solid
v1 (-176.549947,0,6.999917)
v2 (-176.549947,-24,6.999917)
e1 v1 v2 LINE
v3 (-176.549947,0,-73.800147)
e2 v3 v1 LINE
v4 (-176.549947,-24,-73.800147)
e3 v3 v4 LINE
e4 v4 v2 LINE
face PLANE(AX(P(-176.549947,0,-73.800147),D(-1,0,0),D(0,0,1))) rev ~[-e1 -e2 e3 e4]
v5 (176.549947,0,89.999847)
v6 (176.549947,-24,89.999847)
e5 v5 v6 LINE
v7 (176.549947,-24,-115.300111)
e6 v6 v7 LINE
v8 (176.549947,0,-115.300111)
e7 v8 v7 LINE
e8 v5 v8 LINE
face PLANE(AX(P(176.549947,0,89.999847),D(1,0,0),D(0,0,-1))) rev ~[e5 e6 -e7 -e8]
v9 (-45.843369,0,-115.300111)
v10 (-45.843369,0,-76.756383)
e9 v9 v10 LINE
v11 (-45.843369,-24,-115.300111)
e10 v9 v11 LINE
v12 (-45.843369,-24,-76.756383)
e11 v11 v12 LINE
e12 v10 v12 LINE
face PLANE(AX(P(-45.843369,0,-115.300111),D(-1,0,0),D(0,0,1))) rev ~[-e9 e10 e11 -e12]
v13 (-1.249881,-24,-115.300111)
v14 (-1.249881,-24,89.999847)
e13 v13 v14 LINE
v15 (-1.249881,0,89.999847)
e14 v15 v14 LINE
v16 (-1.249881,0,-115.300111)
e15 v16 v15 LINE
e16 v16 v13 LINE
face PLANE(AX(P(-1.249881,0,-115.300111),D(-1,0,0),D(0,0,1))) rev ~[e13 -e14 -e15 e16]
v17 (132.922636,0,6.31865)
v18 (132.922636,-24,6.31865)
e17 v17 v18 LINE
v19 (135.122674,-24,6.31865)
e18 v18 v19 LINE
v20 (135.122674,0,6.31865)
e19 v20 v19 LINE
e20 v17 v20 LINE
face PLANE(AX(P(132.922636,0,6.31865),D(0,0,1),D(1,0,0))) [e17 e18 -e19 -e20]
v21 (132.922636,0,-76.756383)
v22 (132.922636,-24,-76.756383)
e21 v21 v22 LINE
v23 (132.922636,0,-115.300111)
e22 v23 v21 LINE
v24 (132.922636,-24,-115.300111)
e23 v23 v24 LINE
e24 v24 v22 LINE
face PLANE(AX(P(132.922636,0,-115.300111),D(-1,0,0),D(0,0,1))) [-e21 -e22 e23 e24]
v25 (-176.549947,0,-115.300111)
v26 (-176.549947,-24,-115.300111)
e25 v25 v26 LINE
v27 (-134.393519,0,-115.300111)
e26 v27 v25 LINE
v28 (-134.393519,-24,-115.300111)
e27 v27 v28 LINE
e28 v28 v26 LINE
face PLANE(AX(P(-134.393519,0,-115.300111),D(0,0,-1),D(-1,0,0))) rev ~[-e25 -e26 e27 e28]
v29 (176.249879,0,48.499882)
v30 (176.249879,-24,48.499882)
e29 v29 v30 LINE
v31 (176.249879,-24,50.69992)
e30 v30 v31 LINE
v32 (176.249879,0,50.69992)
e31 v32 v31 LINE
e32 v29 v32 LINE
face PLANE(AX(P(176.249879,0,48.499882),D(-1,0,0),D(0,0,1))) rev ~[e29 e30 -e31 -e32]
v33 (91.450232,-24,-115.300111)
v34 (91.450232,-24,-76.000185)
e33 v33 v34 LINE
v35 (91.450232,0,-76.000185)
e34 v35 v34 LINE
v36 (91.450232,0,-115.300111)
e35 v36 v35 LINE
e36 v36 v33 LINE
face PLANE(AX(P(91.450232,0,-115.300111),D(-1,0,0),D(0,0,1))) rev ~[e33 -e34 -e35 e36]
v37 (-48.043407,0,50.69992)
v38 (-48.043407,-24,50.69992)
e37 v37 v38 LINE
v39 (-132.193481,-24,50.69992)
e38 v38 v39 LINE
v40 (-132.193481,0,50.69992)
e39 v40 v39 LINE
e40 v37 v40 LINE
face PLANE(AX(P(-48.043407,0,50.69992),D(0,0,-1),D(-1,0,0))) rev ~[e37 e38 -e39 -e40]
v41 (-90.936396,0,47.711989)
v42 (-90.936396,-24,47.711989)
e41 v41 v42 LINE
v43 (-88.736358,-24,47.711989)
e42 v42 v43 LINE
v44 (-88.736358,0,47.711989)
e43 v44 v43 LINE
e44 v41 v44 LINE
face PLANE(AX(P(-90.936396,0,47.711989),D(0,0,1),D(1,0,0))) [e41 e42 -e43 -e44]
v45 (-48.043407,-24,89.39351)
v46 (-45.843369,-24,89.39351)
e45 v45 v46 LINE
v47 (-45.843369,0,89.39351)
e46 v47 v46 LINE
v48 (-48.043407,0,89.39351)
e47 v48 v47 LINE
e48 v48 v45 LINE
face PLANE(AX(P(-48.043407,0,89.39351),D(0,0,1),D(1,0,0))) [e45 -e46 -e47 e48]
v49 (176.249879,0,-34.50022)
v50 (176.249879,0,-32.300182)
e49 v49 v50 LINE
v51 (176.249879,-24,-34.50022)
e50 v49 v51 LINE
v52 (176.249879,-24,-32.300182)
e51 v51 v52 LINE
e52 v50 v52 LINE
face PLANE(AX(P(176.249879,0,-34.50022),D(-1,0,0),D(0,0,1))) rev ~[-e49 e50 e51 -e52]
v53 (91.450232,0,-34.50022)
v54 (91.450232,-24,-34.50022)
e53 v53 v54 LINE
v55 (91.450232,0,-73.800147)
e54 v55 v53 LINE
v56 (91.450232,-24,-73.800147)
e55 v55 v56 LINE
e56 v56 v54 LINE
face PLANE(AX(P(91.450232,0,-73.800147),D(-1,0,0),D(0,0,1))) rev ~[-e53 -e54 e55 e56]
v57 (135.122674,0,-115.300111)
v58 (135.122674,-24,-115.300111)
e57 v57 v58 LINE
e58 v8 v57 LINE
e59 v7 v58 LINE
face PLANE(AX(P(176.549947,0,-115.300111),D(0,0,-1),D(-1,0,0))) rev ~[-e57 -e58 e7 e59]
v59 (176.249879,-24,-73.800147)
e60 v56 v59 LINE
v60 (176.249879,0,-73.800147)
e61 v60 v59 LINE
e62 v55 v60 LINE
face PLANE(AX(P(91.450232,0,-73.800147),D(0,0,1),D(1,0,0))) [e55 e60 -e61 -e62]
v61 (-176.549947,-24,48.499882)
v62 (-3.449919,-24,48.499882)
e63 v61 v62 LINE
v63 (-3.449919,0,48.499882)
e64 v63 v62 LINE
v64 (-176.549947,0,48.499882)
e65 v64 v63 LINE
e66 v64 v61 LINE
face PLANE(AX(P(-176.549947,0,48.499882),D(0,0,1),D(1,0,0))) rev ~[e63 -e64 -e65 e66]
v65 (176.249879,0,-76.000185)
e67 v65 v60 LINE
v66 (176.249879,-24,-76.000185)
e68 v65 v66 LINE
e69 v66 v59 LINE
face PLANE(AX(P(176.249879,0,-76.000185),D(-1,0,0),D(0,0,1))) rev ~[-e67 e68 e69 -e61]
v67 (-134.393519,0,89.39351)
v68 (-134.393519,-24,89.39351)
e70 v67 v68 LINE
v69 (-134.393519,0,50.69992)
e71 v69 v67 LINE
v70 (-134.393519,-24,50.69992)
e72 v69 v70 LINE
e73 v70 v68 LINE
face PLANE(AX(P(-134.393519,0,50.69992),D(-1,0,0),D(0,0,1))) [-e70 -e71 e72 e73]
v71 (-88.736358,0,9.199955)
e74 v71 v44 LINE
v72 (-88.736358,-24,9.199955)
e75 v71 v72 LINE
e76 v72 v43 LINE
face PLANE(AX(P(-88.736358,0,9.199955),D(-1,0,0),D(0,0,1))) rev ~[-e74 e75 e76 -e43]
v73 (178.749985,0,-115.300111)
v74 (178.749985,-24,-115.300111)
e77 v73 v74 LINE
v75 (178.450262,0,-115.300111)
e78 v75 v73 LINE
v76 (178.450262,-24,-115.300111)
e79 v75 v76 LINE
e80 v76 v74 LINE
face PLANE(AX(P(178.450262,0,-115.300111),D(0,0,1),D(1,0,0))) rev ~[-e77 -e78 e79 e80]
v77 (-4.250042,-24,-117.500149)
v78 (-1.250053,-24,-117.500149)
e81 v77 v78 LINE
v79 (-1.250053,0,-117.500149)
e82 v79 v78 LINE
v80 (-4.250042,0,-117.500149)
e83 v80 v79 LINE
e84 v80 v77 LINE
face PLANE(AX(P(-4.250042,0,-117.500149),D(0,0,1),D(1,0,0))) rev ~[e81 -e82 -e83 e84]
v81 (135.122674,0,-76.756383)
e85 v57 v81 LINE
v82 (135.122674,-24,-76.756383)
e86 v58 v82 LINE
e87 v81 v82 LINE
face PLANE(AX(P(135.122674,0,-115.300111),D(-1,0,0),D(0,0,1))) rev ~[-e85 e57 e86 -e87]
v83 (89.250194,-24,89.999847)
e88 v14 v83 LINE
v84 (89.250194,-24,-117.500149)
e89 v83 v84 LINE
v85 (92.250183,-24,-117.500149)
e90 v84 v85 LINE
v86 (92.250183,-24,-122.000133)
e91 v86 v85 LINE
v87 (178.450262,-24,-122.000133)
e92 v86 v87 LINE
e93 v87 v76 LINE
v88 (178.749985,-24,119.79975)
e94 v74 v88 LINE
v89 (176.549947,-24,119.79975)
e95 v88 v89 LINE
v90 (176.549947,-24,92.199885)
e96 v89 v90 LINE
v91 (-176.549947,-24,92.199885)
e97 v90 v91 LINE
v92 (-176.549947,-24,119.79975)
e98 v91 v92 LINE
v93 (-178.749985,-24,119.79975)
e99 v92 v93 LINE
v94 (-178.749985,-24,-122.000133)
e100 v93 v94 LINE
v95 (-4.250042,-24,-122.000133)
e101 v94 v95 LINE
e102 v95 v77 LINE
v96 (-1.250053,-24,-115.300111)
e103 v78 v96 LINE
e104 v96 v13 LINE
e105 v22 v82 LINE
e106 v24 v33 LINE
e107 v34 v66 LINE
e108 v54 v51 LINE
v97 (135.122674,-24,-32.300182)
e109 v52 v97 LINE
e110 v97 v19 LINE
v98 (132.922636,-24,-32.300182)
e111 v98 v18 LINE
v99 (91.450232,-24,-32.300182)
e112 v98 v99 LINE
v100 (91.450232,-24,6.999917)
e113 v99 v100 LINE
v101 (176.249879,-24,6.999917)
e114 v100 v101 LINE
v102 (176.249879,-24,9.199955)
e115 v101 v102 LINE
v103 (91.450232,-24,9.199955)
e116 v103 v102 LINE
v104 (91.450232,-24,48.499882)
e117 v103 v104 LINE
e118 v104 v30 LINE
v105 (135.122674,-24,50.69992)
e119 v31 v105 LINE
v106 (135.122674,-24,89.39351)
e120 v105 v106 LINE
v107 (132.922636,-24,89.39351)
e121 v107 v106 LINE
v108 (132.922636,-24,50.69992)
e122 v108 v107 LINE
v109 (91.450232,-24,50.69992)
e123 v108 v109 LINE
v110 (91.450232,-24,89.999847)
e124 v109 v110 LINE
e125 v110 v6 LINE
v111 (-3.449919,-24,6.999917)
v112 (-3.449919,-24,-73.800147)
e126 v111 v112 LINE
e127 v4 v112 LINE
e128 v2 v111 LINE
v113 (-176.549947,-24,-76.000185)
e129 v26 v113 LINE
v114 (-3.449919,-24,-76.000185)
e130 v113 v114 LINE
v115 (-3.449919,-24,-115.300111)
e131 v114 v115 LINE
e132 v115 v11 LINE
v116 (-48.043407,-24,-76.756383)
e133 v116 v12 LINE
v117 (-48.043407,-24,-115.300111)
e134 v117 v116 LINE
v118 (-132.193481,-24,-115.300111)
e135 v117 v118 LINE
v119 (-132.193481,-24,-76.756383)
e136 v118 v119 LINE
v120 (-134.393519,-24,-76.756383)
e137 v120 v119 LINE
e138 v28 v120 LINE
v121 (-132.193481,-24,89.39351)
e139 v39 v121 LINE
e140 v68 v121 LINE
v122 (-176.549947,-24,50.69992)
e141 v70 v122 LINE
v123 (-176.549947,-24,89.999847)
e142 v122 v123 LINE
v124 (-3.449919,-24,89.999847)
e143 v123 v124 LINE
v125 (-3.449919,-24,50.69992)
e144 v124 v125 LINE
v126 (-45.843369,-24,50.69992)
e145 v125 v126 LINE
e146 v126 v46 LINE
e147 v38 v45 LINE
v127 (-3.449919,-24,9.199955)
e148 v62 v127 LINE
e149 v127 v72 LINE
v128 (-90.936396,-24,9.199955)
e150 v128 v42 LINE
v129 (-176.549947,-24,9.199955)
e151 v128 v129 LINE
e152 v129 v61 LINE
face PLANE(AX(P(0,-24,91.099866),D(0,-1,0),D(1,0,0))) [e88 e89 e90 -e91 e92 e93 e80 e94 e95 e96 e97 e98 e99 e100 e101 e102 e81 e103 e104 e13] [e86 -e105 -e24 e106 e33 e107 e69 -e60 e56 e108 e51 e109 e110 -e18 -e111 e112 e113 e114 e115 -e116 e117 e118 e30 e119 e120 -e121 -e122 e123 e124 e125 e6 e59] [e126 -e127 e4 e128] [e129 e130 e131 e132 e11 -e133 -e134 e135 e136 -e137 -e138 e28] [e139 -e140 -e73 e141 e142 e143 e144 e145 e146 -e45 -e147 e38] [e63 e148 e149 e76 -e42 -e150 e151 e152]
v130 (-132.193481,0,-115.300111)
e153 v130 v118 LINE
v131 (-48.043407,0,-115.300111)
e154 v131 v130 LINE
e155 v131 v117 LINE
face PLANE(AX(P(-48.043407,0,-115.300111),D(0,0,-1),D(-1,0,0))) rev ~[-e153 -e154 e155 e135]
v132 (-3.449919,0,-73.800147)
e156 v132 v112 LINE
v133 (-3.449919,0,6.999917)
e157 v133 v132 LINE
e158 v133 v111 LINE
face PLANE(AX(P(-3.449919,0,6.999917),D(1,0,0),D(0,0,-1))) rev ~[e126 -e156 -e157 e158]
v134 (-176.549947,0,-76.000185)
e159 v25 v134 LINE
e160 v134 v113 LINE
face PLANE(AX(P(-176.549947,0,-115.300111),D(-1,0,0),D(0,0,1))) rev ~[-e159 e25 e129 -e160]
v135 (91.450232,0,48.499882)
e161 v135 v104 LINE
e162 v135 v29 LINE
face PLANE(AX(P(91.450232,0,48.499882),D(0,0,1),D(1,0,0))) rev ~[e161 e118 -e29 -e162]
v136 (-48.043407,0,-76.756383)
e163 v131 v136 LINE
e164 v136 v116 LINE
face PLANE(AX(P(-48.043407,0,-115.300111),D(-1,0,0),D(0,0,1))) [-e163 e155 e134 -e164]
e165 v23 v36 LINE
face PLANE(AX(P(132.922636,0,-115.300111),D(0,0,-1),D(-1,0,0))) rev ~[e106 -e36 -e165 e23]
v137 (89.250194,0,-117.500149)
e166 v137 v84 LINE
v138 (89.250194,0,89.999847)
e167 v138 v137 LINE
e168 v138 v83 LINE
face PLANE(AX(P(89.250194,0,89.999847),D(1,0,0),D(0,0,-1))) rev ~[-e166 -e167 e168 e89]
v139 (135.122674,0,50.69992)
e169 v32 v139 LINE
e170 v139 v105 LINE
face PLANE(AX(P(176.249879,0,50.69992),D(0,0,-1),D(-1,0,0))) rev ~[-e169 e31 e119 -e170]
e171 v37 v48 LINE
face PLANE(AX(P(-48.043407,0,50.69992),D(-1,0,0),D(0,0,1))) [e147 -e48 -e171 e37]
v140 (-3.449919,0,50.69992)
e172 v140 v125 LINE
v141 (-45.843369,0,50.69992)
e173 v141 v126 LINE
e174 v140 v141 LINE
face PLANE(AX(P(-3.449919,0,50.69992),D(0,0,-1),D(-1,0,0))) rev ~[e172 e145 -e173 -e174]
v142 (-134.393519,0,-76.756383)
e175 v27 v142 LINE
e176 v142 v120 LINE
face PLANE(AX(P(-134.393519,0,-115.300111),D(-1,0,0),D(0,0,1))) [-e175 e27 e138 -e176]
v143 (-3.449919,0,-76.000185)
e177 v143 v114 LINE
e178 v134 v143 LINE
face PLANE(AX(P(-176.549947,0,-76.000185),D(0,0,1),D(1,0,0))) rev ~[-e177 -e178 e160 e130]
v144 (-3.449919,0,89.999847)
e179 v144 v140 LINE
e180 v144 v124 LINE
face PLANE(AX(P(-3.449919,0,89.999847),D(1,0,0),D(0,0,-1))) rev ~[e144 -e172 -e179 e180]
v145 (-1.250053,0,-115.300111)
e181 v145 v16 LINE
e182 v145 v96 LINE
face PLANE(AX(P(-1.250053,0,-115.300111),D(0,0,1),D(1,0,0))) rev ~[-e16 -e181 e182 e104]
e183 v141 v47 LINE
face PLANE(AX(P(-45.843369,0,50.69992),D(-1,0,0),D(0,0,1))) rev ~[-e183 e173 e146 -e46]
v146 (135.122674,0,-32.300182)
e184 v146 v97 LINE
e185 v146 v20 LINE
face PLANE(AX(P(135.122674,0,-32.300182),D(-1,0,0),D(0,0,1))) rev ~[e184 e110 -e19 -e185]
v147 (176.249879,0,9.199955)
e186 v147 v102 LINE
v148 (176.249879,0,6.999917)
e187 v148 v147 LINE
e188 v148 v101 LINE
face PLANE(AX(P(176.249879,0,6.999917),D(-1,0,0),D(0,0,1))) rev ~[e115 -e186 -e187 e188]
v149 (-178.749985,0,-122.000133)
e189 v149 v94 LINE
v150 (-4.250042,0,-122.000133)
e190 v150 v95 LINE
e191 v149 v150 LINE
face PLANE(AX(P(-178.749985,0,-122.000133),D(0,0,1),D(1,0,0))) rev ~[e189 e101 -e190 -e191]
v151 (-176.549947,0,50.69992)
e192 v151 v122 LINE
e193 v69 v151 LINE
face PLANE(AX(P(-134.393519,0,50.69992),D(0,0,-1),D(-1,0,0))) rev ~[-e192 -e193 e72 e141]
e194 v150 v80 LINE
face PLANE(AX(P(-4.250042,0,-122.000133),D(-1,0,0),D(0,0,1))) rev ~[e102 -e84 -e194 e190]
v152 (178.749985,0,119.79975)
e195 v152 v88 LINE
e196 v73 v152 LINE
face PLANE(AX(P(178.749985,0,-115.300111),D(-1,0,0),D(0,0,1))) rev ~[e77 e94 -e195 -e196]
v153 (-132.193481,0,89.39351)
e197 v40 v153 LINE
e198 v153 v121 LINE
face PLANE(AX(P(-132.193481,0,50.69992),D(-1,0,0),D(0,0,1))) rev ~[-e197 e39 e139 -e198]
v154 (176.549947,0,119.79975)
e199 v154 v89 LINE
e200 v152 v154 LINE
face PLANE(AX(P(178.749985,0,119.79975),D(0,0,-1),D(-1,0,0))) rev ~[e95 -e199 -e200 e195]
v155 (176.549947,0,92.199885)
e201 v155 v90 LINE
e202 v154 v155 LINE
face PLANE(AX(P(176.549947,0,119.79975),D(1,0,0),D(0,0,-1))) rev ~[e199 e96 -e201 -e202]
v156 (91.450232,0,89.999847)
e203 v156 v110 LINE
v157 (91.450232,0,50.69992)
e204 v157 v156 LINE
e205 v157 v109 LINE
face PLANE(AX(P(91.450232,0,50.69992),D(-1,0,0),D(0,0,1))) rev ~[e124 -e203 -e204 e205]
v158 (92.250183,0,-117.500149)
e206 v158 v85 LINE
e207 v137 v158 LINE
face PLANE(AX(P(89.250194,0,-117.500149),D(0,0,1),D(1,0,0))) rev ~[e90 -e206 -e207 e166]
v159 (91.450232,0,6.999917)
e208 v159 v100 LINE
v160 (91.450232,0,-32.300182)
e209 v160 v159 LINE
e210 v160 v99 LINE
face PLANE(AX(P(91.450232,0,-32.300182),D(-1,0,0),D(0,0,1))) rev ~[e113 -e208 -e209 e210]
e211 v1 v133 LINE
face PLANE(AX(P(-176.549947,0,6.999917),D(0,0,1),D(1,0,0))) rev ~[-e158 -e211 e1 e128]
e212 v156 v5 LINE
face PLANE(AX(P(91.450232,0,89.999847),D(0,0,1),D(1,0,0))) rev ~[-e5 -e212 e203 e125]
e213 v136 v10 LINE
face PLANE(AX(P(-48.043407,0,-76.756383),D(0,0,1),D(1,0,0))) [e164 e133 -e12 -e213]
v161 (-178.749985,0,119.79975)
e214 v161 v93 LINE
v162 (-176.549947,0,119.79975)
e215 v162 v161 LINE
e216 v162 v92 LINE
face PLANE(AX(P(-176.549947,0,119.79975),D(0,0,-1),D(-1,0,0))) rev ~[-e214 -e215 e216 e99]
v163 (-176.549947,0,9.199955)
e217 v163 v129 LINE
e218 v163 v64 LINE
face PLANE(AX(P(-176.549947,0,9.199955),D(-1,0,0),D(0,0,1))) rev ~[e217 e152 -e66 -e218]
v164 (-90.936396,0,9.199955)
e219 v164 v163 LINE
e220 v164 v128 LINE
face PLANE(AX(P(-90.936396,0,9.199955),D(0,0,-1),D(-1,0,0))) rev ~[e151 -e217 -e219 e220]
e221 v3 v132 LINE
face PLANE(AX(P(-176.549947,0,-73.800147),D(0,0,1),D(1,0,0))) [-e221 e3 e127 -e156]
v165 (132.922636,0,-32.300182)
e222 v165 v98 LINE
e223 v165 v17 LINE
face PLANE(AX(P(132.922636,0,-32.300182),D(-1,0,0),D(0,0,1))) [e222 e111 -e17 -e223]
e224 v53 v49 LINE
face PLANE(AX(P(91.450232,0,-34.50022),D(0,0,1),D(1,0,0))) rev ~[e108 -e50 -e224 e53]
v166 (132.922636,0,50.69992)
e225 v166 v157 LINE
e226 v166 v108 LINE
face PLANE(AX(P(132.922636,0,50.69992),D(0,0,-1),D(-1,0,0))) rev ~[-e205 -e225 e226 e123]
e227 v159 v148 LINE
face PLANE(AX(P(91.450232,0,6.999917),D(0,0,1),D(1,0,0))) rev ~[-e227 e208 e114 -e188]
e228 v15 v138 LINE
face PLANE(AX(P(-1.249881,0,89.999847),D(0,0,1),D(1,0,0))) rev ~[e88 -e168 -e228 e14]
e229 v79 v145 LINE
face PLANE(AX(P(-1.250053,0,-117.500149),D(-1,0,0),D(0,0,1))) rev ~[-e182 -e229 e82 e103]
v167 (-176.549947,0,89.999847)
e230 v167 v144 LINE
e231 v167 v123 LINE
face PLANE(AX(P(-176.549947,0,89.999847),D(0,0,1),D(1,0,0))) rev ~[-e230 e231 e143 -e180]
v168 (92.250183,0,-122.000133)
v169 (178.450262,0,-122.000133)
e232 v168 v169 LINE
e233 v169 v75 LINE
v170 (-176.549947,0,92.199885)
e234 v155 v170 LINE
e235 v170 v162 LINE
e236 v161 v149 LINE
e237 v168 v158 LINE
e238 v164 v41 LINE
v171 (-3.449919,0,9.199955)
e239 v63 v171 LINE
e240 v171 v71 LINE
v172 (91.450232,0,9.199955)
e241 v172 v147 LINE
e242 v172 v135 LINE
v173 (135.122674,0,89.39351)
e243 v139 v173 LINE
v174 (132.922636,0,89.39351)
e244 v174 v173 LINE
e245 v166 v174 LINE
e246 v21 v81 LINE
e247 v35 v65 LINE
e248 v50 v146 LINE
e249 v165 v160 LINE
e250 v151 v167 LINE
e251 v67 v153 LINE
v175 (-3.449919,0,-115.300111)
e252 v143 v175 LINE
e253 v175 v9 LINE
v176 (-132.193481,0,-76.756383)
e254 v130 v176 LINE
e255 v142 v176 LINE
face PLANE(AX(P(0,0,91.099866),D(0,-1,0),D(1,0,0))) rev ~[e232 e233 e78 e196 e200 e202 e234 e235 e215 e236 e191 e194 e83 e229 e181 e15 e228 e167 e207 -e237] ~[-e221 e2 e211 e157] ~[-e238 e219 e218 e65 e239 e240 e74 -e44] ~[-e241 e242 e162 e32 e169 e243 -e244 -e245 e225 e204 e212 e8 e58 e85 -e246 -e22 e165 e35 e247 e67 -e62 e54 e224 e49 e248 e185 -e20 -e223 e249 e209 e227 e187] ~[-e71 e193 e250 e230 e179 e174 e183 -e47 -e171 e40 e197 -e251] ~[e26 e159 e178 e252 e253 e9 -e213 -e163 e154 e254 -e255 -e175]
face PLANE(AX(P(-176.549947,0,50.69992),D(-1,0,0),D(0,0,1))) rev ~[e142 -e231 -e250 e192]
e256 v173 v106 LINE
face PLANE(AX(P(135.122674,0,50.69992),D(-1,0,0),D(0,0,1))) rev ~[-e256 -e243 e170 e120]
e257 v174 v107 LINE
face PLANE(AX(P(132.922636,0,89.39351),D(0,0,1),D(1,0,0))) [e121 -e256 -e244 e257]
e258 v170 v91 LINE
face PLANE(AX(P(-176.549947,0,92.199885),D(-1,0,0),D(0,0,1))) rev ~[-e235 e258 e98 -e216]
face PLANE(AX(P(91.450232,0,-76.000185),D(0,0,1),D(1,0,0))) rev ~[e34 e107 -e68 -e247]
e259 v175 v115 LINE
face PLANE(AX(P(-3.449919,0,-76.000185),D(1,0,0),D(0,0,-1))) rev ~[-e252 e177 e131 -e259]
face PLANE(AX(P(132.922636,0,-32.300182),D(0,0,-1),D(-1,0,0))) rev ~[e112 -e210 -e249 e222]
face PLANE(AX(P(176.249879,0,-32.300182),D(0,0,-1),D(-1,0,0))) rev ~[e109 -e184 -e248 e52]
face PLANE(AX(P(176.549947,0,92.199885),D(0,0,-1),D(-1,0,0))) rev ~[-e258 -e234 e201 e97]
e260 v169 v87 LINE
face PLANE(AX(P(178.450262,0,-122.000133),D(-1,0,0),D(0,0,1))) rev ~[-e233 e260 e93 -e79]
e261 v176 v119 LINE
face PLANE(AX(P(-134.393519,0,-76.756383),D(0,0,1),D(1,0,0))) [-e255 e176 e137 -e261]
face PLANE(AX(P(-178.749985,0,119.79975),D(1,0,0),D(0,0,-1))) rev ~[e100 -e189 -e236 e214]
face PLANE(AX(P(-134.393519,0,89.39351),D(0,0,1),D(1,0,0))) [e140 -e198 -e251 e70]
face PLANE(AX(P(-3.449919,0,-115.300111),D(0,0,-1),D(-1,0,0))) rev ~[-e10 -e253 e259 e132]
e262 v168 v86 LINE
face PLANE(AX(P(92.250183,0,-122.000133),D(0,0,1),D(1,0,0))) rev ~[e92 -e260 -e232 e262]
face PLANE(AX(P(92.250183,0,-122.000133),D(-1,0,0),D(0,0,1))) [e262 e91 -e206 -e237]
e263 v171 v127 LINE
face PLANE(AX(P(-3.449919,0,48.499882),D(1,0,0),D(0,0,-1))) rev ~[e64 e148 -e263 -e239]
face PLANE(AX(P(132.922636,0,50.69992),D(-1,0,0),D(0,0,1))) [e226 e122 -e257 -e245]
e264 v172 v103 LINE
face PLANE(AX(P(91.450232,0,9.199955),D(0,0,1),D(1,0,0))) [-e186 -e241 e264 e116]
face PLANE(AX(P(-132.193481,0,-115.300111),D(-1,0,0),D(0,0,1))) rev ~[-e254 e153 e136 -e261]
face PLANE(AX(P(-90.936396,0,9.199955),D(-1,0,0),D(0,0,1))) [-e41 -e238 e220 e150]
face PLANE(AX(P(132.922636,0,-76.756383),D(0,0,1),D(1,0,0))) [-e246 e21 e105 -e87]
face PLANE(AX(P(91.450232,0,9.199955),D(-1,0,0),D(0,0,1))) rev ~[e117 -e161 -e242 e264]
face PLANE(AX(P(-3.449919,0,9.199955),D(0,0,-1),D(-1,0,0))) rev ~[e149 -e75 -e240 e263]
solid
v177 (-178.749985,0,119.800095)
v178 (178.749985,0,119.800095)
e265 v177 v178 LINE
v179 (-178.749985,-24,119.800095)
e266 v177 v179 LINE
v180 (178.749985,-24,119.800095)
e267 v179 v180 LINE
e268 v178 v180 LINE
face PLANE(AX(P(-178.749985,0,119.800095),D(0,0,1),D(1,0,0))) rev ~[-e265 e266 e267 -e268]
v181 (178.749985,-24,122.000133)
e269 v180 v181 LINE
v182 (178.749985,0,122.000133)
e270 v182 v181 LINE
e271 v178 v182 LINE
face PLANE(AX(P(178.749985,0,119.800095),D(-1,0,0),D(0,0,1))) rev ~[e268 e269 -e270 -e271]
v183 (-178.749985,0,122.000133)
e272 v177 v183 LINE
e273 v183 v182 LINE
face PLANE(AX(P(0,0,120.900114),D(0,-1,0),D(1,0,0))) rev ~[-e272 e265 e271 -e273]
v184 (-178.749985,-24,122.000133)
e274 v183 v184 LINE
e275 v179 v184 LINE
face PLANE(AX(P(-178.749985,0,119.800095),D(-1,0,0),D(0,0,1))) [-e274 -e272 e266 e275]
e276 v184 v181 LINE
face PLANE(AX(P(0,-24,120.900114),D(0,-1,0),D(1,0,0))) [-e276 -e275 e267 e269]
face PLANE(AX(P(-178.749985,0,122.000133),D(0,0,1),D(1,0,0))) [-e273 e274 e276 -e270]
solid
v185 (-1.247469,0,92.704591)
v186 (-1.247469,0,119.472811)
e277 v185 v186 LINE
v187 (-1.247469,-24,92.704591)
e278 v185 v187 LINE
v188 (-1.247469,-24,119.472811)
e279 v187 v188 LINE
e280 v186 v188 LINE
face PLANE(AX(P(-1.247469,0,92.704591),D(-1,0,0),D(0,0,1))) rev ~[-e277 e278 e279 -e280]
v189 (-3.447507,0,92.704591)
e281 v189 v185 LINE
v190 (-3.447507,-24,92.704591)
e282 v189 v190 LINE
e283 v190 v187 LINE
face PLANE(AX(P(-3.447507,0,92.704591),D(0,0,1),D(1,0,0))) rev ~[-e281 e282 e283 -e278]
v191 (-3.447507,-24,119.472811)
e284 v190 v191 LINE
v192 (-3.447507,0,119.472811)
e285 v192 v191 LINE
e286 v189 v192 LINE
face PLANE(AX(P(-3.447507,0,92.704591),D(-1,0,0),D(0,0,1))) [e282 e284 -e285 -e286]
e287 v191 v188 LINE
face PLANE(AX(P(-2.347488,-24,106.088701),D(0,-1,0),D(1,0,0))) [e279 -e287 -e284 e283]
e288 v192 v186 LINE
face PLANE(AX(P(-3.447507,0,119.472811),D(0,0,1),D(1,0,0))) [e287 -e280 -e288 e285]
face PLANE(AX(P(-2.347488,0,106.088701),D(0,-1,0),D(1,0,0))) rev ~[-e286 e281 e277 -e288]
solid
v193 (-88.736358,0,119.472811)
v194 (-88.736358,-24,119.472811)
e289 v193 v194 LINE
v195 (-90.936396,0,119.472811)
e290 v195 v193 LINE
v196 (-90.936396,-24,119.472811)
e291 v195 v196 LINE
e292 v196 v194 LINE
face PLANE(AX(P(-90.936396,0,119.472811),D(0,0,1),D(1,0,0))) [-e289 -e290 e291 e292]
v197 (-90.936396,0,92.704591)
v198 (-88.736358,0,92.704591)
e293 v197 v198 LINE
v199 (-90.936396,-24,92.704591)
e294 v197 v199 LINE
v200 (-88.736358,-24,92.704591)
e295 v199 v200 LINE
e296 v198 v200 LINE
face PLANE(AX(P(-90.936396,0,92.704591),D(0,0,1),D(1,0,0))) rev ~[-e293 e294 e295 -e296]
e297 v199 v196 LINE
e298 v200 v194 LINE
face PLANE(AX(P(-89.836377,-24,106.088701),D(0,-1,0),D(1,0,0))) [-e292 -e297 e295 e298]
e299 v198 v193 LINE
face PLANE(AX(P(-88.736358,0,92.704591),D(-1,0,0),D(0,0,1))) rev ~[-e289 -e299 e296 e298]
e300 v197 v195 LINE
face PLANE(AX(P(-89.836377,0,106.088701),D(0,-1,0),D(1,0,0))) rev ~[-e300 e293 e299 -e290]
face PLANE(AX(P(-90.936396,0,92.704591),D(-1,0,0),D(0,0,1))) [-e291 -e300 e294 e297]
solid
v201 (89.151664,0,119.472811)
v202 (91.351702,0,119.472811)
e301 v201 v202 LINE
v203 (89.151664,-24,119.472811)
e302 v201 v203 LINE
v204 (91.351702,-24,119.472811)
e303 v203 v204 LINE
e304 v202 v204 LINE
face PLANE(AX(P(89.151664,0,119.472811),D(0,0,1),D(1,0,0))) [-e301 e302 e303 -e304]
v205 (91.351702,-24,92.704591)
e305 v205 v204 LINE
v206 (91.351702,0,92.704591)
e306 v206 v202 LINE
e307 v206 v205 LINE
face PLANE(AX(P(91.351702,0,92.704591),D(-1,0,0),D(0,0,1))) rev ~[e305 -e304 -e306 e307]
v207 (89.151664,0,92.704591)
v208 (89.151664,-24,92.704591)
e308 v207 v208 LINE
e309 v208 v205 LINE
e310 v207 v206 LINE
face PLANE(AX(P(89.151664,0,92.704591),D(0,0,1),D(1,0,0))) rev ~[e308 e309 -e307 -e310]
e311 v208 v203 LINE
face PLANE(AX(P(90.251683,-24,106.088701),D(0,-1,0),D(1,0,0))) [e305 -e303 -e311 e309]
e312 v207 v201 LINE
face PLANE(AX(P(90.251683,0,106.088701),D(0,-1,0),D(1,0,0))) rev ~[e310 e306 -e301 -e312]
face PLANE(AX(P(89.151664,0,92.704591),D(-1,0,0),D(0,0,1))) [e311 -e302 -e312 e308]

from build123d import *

# Parameters (mm, degrees)
F0_W     = 357.49997
F0_H     = 2.200038
F1_DEPTH = 24
F0_W_2   = 0.000344
F0_W_3   = 2.200038
F0_H_2   = 0.156408
F0_H_3   = 38.543728
F0_H_4   = 38.69359
F0_H_5   = 0.006374
F0_W_4   = 86.200079
F0_H_6   = 0.000344
F0_W_5   = 84.799647
F0_H_7   = 4.499984
F0_W_6   = 174.499943
F0_W_7   = 173.100028
F0_H_8   = 38.618832
F0_H_9   = 0.081304
F0_H_10  = 38.512034
F0_H_11  = 0.18793
F0_H_12  = 26.76822


with BuildPart() as f1:
    # F0 (on Front) → F1 (new body)
    with BuildSketch(Plane.XZ):
        with Locations((0, 120.900114)):
            Rectangle(F0_W, F0_H)
    extrude(amount=F1_DEPTH)


with BuildPart() as f1b:
    # F0 (on Front) → F1, piece 2 (new body)
    with BuildSketch(Plane.XZ):
        Polygon((91.450232, 89.999847), (176.549947, 89.999847), (176.549947, 92.199885), (-176.549947, 92.199885), (-176.549947, 89.999847), (-3.449919, 89.999847), (-1.249881, 89.999847), (89.250194, 89.999847), align=None)
        Polygon((176.549947, 92.199885), (176.549947, 89.999847), (176.549947, -115.300111), (178.450262, -115.300111), (178.749985, -115.300111), (178.749985, 119.79975), (176.549947, 119.79975), align=None)
        Polygon((91.450232, 50.69992), (91.450232, 89.999847), (89.250194, 89.999847), (89.250194, -115.300111), (91.450232, -115.300111), (91.450232, -76.000185), (91.449888, -76.000185), (91.449888, -73.800147), (91.450232, -73.800147), (91.450232, -34.50022), (91.449888, -34.50022), (91.449888, -32.300182), (91.450232, -32.300182), (91.450232, 6.999917), (91.449888, 6.999917), (91.449888, 9.199955), (91.450232, 9.199955), (91.450232, 48.499882), (91.449888, 48.499882), (91.449888, 50.69992), align=None)
        Polygon((178.450262, -115.300111), (176.549947, -115.300111), (135.122674, -115.300111), (135.122674, -115.456519), (132.922636, -115.456519), (132.922636, -115.300111), (91.450232, -115.300111), (89.250194, -115.300111), (89.250194, -117.500149), (92.250183, -117.500149), (92.250183, -117.499805), (178.450262, -117.499805), align=None)
        with Locations((91.45006, 49.599901)):
            Rectangle(F0_W_2, F0_H)
        Polygon((132.922636, 50.69992), (91.450232, 50.69992), (91.450232, 48.499882), (176.249879, 48.499882), (176.249879, 50.69992), (135.122674, 50.69992), (135.122674, 50.693546), (132.922636, 50.693546), align=None)
        Polygon((-176.549947, 89.999847), (-176.549947, 92.199885), (-176.549947, 119.79975), (-178.749985, 119.79975), (-178.749985, -115.300111), (-176.549947, -115.300111), (-176.549947, -76.000185), (-176.549947, -73.800147), (-176.549947, 6.999917), (-176.549947, 9.199955), (-176.549947, 48.499882), (-176.549947, 50.69992), align=None)
        with Locations((134.022655, -115.378315)):
            Rectangle(F0_W_3, F0_H_2)
        with Locations((134.022655, -96.028247)):
            Rectangle(F0_W_3, F0_H_3)
        Polygon((-1.249881, -115.300111), (-1.249881, 89.999847), (-3.449919, 89.999847), (-3.449919, 50.69992), (-3.449919, 48.499882), (-3.449919, 9.199955), (-3.449919, 6.999917), (-3.449919, -73.800147), (-3.449919, -76.000185), (-3.449919, -115.300111), (-1.250053, -115.300111), align=None)
        with Locations((134.022655, 70.046715)):
            Rectangle(F0_W_3, F0_H_4)
        with Locations((134.022655, 50.696733)):
            Rectangle(F0_W_3, F0_H_5)
        with Locations((135.3502225, -117.499977)):
            Rectangle(F0_W_4, F0_H_6)
        with Locations((91.45006, 8.099936)):
            Rectangle(F0_W_2, F0_H)
        with Locations((133.8500555, 8.099936)):
            Rectangle(F0_W_5, F0_H)
        Polygon((-134.393519, 50.69992), (-176.549947, 50.69992), (-176.549947, 48.499882), (-3.449919, 48.499882), (-3.449919, 50.69992), (-45.843369, 50.69992), (-45.843369, 50.693546), (-48.043407, 50.693546), (-48.043407, 50.69992), (-132.193481, 50.69992), (-132.193481, 50.693546), (-134.393519, 50.693546), align=None)
        with Locations((135.3502225, -119.750141)):
            Rectangle(F0_W_4, F0_H_7)
        Polygon((-1.250053, -117.500149), (-1.250053, -115.300111), (-3.449919, -115.300111), (-45.843369, -115.300111), (-45.843369, -115.456519), (-48.043407, -115.456519), (-48.043407, -115.300111), (-132.193481, -115.300111), (-132.193481, -115.456519), (-134.393519, -115.456519), (-134.393519, -115.300111), (-176.549947, -115.300111), (-178.749985, -115.300111), (-178.749985, -117.499805), (-4.250042, -117.499805), (-4.250042, -117.500149), align=None)
        with Locations((133.8500555, -74.900166)):
            Rectangle(F0_W_5, F0_H)
        with Locations((91.45006, -74.900166)):
            Rectangle(F0_W_2, F0_H)
        with Locations((-133.2935, 70.046715)):
            Rectangle(F0_W_3, F0_H_4)
        with Locations((-133.2935, 50.696733)):
            Rectangle(F0_W_3, F0_H_5)
        with Locations((-46.943388, 50.696733)):
            Rectangle(F0_W_3, F0_H_5)
        with Locations((-46.943388, 70.046715)):
            Rectangle(F0_W_3, F0_H_4)
        with Locations((91.45006, -33.400201)):
            Rectangle(F0_W_2, F0_H)
        Polygon((132.922636, -32.300182), (91.450232, -32.300182), (91.450232, -34.50022), (176.249879, -34.50022), (176.249879, -32.300182), (135.122674, -32.300182), (135.122674, -32.381486), (132.922636, -32.381486), align=None)
        Polygon((-90.936396, 9.199955), (-176.549947, 9.199955), (-176.549947, 6.999917), (-3.449919, 6.999917), (-3.449919, 9.199955), (-88.736358, 9.199955), (-88.736358, 9.012025), (-90.936396, 9.012025), align=None)
        with Locations((-91.5000135, -117.499977)):
            Rectangle(F0_W_6, F0_H_6)
        with Locations((-46.943388, -115.378315)):
            Rectangle(F0_W_3, F0_H_2)
        with Locations((-46.943388, -96.028247)):
            Rectangle(F0_W_3, F0_H_3)
        with Locations((-89.999933, -74.900166)):
            Rectangle(F0_W_7, F0_H)
        with Locations((-91.5000135, -119.750141)):
            Rectangle(F0_W_6, F0_H_7)
        with Locations((134.022655, -12.990766)):
            Rectangle(F0_W_3, F0_H_8)
        with Locations((134.022655, -32.340834)):
            Rectangle(F0_W_3, F0_H_9)
        with Locations((-89.836377, 28.455972)):
            Rectangle(F0_W_3, F0_H_10)
        with Locations((-89.836377, 9.10599)):
            Rectangle(F0_W_3, F0_H_11)
        with Locations((-133.2935, -96.028247)):
            Rectangle(F0_W_3, F0_H_3)
        with Locations((-133.2935, -115.378315)):
            Rectangle(F0_W_3, F0_H_2)
    extrude(amount=F1_DEPTH)


with BuildPart() as f1c:
    # F0 (on Front) → F1, piece 3 (new body)
    with BuildSketch(Plane.XZ):
        with Locations((-89.836377, 106.088701)):
            Rectangle(F0_W_3, F0_H_12)
    extrude(amount=F1_DEPTH)


with BuildPart() as f1d:
    # F0 (on Front) → F1, piece 4 (new body)
    with BuildSketch(Plane.XZ):
        with Locations((-2.347488, 106.088701)):
            Rectangle(F0_W_3, F0_H_12)
    extrude(amount=F1_DEPTH)


with BuildPart() as f1e:
    # F0 (on Front) → F1, piece 5 (new body)
    with BuildSketch(Plane.XZ):
        with Locations((90.251683, 106.088701)):
            Rectangle(F0_W_3, F0_H_12)
    extrude(amount=F1_DEPTH)


solid = Compound([f1.part, f1b.part, f1c.part, f1d.part, f1e.part])
